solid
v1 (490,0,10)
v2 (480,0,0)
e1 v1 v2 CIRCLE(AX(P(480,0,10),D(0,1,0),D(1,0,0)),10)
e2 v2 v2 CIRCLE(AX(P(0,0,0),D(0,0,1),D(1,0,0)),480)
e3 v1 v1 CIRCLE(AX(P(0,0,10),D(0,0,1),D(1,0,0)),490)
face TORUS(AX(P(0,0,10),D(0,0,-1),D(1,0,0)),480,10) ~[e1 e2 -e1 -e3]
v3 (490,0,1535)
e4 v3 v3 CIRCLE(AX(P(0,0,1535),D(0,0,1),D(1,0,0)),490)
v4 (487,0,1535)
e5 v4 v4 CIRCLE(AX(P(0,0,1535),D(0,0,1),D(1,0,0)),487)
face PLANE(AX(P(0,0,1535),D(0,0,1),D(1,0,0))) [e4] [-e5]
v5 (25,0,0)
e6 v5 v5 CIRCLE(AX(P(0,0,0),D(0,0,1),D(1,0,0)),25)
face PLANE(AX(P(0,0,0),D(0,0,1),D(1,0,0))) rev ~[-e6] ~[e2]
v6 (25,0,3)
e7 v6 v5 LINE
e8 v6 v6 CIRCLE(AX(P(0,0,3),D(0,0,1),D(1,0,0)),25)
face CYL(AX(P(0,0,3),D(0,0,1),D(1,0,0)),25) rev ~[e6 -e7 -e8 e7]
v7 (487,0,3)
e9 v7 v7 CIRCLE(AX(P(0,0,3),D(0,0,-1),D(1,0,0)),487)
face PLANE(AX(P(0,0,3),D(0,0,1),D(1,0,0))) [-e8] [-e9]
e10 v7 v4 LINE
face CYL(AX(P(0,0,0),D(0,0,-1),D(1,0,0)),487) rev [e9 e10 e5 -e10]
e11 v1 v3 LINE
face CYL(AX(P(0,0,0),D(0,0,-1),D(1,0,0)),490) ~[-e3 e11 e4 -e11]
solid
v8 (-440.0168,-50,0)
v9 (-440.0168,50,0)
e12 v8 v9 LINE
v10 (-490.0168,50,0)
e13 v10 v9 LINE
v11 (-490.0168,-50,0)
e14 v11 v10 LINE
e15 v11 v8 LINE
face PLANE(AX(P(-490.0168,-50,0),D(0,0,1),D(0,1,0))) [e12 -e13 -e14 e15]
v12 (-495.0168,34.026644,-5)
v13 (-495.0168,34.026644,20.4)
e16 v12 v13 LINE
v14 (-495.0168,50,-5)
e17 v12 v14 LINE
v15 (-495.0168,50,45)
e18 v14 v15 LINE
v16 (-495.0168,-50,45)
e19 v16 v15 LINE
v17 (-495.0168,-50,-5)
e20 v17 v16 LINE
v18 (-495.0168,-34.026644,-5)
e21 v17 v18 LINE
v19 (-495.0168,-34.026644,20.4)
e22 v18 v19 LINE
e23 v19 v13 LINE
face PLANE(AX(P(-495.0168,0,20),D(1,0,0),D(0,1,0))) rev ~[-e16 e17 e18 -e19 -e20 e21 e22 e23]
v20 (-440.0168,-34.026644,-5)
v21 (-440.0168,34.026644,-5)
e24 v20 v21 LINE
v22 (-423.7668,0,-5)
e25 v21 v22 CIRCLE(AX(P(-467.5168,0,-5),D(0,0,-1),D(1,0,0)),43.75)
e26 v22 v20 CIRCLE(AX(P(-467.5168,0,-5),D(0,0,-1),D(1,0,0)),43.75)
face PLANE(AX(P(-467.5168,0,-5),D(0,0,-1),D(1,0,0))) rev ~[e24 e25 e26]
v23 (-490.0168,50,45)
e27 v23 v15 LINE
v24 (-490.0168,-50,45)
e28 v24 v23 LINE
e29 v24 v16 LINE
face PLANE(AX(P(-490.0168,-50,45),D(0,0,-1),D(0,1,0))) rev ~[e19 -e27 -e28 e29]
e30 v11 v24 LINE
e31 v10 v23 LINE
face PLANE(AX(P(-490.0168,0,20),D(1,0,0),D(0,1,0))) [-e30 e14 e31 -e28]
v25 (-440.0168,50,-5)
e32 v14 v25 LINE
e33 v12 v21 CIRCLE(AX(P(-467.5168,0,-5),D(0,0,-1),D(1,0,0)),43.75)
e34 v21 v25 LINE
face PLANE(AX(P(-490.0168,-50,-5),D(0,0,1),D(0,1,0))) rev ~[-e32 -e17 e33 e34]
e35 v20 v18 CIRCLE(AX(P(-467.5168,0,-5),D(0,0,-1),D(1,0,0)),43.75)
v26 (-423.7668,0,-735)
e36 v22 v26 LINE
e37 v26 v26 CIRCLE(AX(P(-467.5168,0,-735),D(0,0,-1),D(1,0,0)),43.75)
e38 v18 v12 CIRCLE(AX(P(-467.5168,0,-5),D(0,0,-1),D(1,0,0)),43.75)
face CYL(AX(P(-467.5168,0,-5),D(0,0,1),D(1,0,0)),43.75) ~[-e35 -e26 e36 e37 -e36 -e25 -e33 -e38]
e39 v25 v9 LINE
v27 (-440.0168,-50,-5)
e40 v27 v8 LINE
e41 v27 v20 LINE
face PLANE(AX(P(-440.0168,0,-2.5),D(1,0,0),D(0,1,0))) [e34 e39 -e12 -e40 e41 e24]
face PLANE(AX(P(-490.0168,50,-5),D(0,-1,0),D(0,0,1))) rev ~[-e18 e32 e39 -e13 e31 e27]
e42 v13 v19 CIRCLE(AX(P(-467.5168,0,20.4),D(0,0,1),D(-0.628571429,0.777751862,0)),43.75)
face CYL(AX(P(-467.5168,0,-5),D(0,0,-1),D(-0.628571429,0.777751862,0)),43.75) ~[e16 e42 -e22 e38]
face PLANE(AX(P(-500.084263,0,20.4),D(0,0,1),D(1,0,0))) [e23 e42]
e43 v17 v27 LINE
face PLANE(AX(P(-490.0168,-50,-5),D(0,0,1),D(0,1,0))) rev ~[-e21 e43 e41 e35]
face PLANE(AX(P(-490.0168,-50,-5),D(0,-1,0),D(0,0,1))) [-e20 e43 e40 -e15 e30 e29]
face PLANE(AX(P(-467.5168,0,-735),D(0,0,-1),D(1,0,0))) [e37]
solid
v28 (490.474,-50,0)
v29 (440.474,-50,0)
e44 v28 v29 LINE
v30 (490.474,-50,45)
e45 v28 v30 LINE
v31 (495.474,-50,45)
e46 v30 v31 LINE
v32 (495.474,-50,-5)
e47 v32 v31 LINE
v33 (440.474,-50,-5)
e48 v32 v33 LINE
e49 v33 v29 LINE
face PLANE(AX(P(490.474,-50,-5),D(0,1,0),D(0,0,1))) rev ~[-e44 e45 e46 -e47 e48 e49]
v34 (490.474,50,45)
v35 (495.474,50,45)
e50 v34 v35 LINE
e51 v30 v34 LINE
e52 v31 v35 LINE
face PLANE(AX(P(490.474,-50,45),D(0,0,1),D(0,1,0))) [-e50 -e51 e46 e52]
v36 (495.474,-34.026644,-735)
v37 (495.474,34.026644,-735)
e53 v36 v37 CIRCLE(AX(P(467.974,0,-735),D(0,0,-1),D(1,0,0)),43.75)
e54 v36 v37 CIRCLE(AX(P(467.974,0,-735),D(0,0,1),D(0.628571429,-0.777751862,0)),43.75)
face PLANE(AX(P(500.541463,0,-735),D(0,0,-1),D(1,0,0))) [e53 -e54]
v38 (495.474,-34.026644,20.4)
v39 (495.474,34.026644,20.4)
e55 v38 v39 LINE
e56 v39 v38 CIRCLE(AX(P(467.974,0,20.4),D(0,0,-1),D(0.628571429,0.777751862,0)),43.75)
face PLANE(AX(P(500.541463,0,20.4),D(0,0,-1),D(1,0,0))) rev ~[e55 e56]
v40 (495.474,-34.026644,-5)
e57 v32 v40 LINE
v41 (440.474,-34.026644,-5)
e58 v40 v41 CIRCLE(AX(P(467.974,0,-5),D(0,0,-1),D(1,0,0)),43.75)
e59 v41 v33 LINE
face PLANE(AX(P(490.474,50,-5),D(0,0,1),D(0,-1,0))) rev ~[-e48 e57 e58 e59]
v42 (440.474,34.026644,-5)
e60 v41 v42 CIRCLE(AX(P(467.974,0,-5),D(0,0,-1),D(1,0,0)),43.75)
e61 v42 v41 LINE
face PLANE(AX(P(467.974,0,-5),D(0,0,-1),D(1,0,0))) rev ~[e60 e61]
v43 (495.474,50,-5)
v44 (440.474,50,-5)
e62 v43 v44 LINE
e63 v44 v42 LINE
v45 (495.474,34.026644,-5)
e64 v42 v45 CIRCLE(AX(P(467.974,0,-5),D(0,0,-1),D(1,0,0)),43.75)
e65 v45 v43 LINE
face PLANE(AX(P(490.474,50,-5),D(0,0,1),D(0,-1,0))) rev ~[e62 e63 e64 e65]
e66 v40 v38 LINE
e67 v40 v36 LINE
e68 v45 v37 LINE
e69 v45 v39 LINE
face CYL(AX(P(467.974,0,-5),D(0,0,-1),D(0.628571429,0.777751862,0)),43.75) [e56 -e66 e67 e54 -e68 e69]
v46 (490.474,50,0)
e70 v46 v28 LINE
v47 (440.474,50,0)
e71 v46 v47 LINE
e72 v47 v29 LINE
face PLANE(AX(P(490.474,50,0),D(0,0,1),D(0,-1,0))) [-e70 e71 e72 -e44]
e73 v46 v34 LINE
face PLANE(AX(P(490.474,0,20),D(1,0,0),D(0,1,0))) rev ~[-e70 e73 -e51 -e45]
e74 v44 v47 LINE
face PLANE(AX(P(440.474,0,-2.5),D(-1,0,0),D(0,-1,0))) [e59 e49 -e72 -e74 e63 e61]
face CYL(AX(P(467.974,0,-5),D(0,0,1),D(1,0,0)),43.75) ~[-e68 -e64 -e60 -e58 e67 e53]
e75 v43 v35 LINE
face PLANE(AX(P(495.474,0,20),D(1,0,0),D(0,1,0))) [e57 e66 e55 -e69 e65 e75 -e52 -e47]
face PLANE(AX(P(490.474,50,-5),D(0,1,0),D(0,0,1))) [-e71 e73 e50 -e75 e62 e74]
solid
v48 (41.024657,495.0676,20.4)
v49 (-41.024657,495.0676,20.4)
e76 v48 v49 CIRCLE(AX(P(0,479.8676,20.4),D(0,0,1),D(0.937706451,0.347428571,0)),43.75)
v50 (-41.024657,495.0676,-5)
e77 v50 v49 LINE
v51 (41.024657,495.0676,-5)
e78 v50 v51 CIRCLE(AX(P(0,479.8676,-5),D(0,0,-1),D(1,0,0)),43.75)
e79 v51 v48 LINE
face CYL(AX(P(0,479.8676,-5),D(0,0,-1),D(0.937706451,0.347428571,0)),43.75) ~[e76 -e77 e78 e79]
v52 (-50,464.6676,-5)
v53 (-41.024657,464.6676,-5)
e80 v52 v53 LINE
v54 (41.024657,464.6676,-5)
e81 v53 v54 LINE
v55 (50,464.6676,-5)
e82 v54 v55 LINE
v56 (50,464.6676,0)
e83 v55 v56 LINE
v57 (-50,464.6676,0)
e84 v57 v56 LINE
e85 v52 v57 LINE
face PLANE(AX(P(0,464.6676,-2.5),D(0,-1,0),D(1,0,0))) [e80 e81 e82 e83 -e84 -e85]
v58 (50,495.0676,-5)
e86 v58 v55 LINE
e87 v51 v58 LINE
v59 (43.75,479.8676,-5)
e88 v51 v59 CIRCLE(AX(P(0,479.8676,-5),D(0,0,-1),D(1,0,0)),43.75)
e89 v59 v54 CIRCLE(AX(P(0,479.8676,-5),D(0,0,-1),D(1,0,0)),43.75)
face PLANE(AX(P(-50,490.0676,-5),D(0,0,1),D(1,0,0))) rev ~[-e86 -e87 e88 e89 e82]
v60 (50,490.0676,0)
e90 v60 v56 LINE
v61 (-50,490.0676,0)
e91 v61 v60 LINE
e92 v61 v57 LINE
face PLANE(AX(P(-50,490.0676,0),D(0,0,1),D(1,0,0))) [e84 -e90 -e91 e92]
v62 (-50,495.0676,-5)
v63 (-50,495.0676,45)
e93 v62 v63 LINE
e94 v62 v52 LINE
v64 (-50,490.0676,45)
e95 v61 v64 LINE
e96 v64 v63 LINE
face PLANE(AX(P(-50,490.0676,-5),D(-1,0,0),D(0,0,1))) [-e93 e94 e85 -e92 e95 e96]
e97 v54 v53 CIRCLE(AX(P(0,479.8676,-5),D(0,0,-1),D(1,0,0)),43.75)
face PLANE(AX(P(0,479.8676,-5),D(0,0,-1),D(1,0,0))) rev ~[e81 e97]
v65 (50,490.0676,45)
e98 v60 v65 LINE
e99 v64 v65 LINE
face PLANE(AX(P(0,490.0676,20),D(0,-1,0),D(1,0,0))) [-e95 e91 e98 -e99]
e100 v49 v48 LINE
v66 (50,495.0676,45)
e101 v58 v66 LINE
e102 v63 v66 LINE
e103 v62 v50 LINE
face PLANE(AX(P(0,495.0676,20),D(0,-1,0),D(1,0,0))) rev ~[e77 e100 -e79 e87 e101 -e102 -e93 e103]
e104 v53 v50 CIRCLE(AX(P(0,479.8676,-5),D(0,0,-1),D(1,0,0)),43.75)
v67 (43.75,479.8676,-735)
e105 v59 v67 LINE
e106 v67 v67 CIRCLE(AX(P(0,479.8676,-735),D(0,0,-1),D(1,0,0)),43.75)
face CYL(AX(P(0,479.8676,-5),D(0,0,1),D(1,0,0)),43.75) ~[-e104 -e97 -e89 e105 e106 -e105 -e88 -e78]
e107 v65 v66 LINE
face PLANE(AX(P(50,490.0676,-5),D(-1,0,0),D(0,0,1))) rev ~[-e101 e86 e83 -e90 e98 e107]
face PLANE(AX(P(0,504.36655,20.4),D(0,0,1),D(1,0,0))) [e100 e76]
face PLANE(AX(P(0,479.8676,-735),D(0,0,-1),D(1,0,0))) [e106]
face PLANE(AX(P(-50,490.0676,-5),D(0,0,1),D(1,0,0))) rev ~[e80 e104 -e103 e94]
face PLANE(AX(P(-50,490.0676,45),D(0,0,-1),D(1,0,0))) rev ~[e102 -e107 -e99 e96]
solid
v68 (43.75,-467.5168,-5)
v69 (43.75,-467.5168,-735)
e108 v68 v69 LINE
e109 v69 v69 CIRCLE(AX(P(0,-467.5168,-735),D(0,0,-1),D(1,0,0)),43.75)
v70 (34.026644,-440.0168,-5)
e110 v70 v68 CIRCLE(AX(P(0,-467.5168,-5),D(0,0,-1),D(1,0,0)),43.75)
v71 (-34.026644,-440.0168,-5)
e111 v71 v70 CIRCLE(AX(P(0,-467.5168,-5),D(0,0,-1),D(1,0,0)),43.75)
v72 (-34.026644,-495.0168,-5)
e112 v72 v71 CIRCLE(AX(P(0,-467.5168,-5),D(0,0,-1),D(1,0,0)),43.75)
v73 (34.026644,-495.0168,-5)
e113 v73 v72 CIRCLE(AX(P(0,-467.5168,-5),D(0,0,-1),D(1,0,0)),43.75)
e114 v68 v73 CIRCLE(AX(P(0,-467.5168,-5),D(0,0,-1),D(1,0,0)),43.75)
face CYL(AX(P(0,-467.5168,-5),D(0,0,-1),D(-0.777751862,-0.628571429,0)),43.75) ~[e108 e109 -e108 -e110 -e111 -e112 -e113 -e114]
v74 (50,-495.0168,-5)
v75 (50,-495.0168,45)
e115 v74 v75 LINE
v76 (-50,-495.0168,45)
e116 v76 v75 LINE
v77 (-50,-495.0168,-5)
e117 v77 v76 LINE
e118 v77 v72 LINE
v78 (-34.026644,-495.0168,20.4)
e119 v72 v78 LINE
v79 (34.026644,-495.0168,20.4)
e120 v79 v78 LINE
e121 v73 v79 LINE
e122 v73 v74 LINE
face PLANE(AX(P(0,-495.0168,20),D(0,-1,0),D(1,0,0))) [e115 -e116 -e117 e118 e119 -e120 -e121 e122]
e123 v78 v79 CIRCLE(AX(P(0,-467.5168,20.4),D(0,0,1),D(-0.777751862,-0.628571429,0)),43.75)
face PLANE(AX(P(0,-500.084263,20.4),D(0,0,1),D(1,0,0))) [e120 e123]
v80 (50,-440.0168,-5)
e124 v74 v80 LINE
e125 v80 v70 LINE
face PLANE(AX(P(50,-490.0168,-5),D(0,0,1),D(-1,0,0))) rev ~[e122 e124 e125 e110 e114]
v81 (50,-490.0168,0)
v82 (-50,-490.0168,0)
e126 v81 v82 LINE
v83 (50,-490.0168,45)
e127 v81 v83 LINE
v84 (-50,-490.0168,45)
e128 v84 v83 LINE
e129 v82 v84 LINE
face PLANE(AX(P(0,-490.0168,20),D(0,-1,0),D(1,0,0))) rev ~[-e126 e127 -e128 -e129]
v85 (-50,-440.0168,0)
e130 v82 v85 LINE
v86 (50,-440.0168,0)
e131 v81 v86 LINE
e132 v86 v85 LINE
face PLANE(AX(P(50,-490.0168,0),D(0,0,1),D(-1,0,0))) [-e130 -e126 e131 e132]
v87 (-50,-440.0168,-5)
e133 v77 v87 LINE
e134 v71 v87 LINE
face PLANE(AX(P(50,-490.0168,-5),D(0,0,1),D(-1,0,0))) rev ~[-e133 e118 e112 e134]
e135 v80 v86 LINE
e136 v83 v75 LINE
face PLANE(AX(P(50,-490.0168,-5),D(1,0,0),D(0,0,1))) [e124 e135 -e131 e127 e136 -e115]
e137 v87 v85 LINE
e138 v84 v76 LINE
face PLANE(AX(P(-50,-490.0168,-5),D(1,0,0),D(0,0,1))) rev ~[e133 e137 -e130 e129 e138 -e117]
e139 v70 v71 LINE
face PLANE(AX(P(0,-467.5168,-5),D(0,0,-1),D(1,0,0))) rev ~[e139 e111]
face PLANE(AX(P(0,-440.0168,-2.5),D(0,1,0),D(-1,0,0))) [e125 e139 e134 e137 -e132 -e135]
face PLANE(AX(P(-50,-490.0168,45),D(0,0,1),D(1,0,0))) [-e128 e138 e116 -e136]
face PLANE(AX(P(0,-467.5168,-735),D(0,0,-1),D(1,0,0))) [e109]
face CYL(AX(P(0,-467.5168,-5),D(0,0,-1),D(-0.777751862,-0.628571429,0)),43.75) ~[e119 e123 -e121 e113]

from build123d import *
from build123d import SkipClean  # not in build123d's __all__

# Parameters (mm, degrees)
F0_R           = 490
F1_DEPTH       = 1535
F2_T           = -3
F3_R           = 10
F5_W           = 100
F5_H           = 50
F6_DEPTH       = 5
F7_W           = 100
F7_H           = 5
F8_DEPTH       = 50
F10_W          = 100
F10_H          = 50
F11_DEPTH      = 5
F12_W          = 100
F12_H          = 5
F13_DEPTH      = 50
F15_W          = 100
F15_H          = 50
F16_DEPTH      = 5
F17_W          = 100
F17_H          = 5
F18_DEPTH      = 50
F20_W          = 100
F20_H          = 50
F21_DEPTH      = 5
F22_W          = 100
F22_H          = 5
F23_DEPTH      = 25.4
F25_DEPTH      = 730
F25_DEPTH_BACK = 25.4
F24_R          = 43.75
F26_DEPTH      = 730
F27_R          = 43.75
F28_DEPTH      = 730
F30_DEPTH      = 25.4
F31_R          = 43.75
F32_DEPTH      = 730
F34_DEPTH      = 25.4
F35_R          = 43.75
F36_DEPTH      = 730
F38_DEPTH      = 25.4
F39_R          = 25
F40_DEPTH      = 25.4


with BuildPart() as f1:
    # F0 (on Top) → F1 (new body)
    with BuildSketch(Plane.XY):
        Circle(F0_R)
    extrude(amount=F1_DEPTH)

    # F2
    f2_openings = [f1.faces().sort_by_distance(p)[0] for p in [
        (0, 0, 1535),
    ]]
    offset(amount=F2_T, openings=f2_openings)

    # F3
    f3_edges = [f1.edges().sort_by_distance(p)[0] for p in [
        (-490, 0, 0),
    ]]
    fillet(f3_edges, radius=F3_R)

    # F39 (on face) → F40 (cut)
    with BuildSketch(Plane.XY.offset(3)):
        Circle(F39_R)
    extrude(amount=-F40_DEPTH, mode=Mode.SUBTRACT)


with BuildPart() as f6:
    # F5 (on offset) → F6 (new body)
    with BuildSketch(Plane.XZ.offset(490.0168)):
        with Locations((0, 20)):
            Rectangle(F5_W, F5_H)
    extrude(amount=F6_DEPTH)

    # F7 (on face) → F8 (join)
    with BuildSketch(Plane(origin=(0, -490.0168, 0), x_dir=(-1, 0, 0), z_dir=(0, 1, 0))):
        with Locations((0, -2.5)):
            Rectangle(F7_W, F7_H)
    extrude(amount=F8_DEPTH)

    # F27 (on face) → F28 (join)
    with BuildSketch(Plane(origin=(0, 0, -5), x_dir=(1, 0, 0), z_dir=(0, 0, -1))):
        with Locations((0, 467.5168)):
            Circle(F27_R)
    extrude(amount=F28_DEPTH)

    # F29 (on face) → F30 (join)
    with BuildSketch(Plane.XY.offset(-5)):
        with BuildLine():
            Line((34.026643972, -495.0168), (-34.026643972, -495.0168))
            ThreePointArc((-34.026643972, -495.0168), (0, -511.2668), (34.026643972, -495.0168))
        make_face()
    extrude(amount=F30_DEPTH)


with BuildPart() as f11:
    # F10 (on offset) → F11 (new body)
    with BuildSketch(Plane.YZ.offset(490.474)):
        with Locations((0, 20)):
            Rectangle(F10_W, F10_H)
    extrude(amount=F11_DEPTH)

    # F12 (on face) → F13 (join)
    with BuildSketch(Plane(origin=(490.474, 0, 0), x_dir=(0, -1, 0), z_dir=(-1, 0, 0))):
        with Locations((0, -2.5)):
            Rectangle(F12_W, F12_H)
    extrude(amount=F13_DEPTH)

    # F24 (on face) → F25 (join, two sides)
    with BuildSketch(Plane(origin=(0, 0, -5), x_dir=(1, 0, 0), z_dir=(0, 0, -1))) as f25_sk:
        with BuildLine():
            ThreePointArc((495.474, -34.026643972), (507.4530292434, -18.8538789112), (511.724, 0))
            ThreePointArc((511.724, 0), (507.4530292434, 18.8538789112), (495.474, 34.026643972))
            Line((495.474, 34.026643972), (495.474, -34.026643972))
        make_face()
    extrude(amount=F25_DEPTH)
    extrude(f25_sk.sketch, amount=-F25_DEPTH_BACK)

    # F24 (on face) → F26 (join)
    with BuildSketch(Plane(origin=(0, 0, -5), x_dir=(1, 0, 0), z_dir=(0, 0, -1))):
        with Locations((467.974, 0)):
            Circle(F24_R)
    extrude(amount=F26_DEPTH)


with BuildPart() as f16:
    # F15 (on offset) → F16 (new body)
    with BuildSketch(Plane.YZ.offset(-490.0168)):
        with Locations((0, 20)):
            Rectangle(F15_W, F15_H)
    extrude(amount=-F16_DEPTH)

    # F17 (on face) → F18 (join)
    with BuildSketch(Plane.YZ.offset(-490.0168)):
        with Locations((0, -2.5)):
            Rectangle(F17_W, F17_H)
    extrude(amount=F18_DEPTH)

    # F31 (on face) → F32 (join)
    with BuildSketch(Plane(origin=(0, 0, -5), x_dir=(1, 0, 0), z_dir=(0, 0, -1))):
        with Locations((-467.5168, 0)):
            Circle(F31_R)
    extrude(amount=F32_DEPTH)

    # F33 (on face) → F34 (join)
    with BuildSketch(Plane.XY.offset(-5)):
        with BuildLine():
            Line((-495.0168, -34.026643972), (-495.0168, 34.026643972))
            ThreePointArc((-495.0168, 34.026643972), (-511.2668, 0), (-495.0168, -34.026643972))
        make_face()
    with SkipClean():  # cleaning this boolean's faces spoils the solid; the shape is the same uncleaned
        extrude(amount=F34_DEPTH)


with BuildPart() as f21:
    # F20 (on offset) → F21 (new body)
    with BuildSketch(Plane.XZ.offset(-490.0676)):
        with Locations((0, 20)):
            Rectangle(F20_W, F20_H)
    extrude(amount=-F21_DEPTH)

    # F22 (on face) → F23 (join)
    with BuildSketch(Plane.XZ.offset(-490.0676)):
        with Locations((0, -2.5)):
            Rectangle(F22_W, F22_H)
    extrude(amount=F23_DEPTH)

    # F35 (on face) → F36 (join)
    with BuildSketch(Plane(origin=(0, 0, -5), x_dir=(1, 0, 0), z_dir=(0, 0, -1))):
        with Locations((0, -479.8676)):
            Circle(F35_R)
    extrude(amount=F36_DEPTH)

    # F37 (on face) → F38 (join)
    with BuildSketch(Plane.XY.offset(-5)):
        with BuildLine():
            Line((-41.0246572198, 495.0676), (41.0246572198, 495.0676))
            ThreePointArc((41.0246572198, 495.0676), (0, 523.6176), (-41.0246572198, 495.0676))
        make_face()
    extrude(amount=F38_DEPTH)


solid = Compound([f1.part, f6.part, f11.part, f16.part, f21.part])
